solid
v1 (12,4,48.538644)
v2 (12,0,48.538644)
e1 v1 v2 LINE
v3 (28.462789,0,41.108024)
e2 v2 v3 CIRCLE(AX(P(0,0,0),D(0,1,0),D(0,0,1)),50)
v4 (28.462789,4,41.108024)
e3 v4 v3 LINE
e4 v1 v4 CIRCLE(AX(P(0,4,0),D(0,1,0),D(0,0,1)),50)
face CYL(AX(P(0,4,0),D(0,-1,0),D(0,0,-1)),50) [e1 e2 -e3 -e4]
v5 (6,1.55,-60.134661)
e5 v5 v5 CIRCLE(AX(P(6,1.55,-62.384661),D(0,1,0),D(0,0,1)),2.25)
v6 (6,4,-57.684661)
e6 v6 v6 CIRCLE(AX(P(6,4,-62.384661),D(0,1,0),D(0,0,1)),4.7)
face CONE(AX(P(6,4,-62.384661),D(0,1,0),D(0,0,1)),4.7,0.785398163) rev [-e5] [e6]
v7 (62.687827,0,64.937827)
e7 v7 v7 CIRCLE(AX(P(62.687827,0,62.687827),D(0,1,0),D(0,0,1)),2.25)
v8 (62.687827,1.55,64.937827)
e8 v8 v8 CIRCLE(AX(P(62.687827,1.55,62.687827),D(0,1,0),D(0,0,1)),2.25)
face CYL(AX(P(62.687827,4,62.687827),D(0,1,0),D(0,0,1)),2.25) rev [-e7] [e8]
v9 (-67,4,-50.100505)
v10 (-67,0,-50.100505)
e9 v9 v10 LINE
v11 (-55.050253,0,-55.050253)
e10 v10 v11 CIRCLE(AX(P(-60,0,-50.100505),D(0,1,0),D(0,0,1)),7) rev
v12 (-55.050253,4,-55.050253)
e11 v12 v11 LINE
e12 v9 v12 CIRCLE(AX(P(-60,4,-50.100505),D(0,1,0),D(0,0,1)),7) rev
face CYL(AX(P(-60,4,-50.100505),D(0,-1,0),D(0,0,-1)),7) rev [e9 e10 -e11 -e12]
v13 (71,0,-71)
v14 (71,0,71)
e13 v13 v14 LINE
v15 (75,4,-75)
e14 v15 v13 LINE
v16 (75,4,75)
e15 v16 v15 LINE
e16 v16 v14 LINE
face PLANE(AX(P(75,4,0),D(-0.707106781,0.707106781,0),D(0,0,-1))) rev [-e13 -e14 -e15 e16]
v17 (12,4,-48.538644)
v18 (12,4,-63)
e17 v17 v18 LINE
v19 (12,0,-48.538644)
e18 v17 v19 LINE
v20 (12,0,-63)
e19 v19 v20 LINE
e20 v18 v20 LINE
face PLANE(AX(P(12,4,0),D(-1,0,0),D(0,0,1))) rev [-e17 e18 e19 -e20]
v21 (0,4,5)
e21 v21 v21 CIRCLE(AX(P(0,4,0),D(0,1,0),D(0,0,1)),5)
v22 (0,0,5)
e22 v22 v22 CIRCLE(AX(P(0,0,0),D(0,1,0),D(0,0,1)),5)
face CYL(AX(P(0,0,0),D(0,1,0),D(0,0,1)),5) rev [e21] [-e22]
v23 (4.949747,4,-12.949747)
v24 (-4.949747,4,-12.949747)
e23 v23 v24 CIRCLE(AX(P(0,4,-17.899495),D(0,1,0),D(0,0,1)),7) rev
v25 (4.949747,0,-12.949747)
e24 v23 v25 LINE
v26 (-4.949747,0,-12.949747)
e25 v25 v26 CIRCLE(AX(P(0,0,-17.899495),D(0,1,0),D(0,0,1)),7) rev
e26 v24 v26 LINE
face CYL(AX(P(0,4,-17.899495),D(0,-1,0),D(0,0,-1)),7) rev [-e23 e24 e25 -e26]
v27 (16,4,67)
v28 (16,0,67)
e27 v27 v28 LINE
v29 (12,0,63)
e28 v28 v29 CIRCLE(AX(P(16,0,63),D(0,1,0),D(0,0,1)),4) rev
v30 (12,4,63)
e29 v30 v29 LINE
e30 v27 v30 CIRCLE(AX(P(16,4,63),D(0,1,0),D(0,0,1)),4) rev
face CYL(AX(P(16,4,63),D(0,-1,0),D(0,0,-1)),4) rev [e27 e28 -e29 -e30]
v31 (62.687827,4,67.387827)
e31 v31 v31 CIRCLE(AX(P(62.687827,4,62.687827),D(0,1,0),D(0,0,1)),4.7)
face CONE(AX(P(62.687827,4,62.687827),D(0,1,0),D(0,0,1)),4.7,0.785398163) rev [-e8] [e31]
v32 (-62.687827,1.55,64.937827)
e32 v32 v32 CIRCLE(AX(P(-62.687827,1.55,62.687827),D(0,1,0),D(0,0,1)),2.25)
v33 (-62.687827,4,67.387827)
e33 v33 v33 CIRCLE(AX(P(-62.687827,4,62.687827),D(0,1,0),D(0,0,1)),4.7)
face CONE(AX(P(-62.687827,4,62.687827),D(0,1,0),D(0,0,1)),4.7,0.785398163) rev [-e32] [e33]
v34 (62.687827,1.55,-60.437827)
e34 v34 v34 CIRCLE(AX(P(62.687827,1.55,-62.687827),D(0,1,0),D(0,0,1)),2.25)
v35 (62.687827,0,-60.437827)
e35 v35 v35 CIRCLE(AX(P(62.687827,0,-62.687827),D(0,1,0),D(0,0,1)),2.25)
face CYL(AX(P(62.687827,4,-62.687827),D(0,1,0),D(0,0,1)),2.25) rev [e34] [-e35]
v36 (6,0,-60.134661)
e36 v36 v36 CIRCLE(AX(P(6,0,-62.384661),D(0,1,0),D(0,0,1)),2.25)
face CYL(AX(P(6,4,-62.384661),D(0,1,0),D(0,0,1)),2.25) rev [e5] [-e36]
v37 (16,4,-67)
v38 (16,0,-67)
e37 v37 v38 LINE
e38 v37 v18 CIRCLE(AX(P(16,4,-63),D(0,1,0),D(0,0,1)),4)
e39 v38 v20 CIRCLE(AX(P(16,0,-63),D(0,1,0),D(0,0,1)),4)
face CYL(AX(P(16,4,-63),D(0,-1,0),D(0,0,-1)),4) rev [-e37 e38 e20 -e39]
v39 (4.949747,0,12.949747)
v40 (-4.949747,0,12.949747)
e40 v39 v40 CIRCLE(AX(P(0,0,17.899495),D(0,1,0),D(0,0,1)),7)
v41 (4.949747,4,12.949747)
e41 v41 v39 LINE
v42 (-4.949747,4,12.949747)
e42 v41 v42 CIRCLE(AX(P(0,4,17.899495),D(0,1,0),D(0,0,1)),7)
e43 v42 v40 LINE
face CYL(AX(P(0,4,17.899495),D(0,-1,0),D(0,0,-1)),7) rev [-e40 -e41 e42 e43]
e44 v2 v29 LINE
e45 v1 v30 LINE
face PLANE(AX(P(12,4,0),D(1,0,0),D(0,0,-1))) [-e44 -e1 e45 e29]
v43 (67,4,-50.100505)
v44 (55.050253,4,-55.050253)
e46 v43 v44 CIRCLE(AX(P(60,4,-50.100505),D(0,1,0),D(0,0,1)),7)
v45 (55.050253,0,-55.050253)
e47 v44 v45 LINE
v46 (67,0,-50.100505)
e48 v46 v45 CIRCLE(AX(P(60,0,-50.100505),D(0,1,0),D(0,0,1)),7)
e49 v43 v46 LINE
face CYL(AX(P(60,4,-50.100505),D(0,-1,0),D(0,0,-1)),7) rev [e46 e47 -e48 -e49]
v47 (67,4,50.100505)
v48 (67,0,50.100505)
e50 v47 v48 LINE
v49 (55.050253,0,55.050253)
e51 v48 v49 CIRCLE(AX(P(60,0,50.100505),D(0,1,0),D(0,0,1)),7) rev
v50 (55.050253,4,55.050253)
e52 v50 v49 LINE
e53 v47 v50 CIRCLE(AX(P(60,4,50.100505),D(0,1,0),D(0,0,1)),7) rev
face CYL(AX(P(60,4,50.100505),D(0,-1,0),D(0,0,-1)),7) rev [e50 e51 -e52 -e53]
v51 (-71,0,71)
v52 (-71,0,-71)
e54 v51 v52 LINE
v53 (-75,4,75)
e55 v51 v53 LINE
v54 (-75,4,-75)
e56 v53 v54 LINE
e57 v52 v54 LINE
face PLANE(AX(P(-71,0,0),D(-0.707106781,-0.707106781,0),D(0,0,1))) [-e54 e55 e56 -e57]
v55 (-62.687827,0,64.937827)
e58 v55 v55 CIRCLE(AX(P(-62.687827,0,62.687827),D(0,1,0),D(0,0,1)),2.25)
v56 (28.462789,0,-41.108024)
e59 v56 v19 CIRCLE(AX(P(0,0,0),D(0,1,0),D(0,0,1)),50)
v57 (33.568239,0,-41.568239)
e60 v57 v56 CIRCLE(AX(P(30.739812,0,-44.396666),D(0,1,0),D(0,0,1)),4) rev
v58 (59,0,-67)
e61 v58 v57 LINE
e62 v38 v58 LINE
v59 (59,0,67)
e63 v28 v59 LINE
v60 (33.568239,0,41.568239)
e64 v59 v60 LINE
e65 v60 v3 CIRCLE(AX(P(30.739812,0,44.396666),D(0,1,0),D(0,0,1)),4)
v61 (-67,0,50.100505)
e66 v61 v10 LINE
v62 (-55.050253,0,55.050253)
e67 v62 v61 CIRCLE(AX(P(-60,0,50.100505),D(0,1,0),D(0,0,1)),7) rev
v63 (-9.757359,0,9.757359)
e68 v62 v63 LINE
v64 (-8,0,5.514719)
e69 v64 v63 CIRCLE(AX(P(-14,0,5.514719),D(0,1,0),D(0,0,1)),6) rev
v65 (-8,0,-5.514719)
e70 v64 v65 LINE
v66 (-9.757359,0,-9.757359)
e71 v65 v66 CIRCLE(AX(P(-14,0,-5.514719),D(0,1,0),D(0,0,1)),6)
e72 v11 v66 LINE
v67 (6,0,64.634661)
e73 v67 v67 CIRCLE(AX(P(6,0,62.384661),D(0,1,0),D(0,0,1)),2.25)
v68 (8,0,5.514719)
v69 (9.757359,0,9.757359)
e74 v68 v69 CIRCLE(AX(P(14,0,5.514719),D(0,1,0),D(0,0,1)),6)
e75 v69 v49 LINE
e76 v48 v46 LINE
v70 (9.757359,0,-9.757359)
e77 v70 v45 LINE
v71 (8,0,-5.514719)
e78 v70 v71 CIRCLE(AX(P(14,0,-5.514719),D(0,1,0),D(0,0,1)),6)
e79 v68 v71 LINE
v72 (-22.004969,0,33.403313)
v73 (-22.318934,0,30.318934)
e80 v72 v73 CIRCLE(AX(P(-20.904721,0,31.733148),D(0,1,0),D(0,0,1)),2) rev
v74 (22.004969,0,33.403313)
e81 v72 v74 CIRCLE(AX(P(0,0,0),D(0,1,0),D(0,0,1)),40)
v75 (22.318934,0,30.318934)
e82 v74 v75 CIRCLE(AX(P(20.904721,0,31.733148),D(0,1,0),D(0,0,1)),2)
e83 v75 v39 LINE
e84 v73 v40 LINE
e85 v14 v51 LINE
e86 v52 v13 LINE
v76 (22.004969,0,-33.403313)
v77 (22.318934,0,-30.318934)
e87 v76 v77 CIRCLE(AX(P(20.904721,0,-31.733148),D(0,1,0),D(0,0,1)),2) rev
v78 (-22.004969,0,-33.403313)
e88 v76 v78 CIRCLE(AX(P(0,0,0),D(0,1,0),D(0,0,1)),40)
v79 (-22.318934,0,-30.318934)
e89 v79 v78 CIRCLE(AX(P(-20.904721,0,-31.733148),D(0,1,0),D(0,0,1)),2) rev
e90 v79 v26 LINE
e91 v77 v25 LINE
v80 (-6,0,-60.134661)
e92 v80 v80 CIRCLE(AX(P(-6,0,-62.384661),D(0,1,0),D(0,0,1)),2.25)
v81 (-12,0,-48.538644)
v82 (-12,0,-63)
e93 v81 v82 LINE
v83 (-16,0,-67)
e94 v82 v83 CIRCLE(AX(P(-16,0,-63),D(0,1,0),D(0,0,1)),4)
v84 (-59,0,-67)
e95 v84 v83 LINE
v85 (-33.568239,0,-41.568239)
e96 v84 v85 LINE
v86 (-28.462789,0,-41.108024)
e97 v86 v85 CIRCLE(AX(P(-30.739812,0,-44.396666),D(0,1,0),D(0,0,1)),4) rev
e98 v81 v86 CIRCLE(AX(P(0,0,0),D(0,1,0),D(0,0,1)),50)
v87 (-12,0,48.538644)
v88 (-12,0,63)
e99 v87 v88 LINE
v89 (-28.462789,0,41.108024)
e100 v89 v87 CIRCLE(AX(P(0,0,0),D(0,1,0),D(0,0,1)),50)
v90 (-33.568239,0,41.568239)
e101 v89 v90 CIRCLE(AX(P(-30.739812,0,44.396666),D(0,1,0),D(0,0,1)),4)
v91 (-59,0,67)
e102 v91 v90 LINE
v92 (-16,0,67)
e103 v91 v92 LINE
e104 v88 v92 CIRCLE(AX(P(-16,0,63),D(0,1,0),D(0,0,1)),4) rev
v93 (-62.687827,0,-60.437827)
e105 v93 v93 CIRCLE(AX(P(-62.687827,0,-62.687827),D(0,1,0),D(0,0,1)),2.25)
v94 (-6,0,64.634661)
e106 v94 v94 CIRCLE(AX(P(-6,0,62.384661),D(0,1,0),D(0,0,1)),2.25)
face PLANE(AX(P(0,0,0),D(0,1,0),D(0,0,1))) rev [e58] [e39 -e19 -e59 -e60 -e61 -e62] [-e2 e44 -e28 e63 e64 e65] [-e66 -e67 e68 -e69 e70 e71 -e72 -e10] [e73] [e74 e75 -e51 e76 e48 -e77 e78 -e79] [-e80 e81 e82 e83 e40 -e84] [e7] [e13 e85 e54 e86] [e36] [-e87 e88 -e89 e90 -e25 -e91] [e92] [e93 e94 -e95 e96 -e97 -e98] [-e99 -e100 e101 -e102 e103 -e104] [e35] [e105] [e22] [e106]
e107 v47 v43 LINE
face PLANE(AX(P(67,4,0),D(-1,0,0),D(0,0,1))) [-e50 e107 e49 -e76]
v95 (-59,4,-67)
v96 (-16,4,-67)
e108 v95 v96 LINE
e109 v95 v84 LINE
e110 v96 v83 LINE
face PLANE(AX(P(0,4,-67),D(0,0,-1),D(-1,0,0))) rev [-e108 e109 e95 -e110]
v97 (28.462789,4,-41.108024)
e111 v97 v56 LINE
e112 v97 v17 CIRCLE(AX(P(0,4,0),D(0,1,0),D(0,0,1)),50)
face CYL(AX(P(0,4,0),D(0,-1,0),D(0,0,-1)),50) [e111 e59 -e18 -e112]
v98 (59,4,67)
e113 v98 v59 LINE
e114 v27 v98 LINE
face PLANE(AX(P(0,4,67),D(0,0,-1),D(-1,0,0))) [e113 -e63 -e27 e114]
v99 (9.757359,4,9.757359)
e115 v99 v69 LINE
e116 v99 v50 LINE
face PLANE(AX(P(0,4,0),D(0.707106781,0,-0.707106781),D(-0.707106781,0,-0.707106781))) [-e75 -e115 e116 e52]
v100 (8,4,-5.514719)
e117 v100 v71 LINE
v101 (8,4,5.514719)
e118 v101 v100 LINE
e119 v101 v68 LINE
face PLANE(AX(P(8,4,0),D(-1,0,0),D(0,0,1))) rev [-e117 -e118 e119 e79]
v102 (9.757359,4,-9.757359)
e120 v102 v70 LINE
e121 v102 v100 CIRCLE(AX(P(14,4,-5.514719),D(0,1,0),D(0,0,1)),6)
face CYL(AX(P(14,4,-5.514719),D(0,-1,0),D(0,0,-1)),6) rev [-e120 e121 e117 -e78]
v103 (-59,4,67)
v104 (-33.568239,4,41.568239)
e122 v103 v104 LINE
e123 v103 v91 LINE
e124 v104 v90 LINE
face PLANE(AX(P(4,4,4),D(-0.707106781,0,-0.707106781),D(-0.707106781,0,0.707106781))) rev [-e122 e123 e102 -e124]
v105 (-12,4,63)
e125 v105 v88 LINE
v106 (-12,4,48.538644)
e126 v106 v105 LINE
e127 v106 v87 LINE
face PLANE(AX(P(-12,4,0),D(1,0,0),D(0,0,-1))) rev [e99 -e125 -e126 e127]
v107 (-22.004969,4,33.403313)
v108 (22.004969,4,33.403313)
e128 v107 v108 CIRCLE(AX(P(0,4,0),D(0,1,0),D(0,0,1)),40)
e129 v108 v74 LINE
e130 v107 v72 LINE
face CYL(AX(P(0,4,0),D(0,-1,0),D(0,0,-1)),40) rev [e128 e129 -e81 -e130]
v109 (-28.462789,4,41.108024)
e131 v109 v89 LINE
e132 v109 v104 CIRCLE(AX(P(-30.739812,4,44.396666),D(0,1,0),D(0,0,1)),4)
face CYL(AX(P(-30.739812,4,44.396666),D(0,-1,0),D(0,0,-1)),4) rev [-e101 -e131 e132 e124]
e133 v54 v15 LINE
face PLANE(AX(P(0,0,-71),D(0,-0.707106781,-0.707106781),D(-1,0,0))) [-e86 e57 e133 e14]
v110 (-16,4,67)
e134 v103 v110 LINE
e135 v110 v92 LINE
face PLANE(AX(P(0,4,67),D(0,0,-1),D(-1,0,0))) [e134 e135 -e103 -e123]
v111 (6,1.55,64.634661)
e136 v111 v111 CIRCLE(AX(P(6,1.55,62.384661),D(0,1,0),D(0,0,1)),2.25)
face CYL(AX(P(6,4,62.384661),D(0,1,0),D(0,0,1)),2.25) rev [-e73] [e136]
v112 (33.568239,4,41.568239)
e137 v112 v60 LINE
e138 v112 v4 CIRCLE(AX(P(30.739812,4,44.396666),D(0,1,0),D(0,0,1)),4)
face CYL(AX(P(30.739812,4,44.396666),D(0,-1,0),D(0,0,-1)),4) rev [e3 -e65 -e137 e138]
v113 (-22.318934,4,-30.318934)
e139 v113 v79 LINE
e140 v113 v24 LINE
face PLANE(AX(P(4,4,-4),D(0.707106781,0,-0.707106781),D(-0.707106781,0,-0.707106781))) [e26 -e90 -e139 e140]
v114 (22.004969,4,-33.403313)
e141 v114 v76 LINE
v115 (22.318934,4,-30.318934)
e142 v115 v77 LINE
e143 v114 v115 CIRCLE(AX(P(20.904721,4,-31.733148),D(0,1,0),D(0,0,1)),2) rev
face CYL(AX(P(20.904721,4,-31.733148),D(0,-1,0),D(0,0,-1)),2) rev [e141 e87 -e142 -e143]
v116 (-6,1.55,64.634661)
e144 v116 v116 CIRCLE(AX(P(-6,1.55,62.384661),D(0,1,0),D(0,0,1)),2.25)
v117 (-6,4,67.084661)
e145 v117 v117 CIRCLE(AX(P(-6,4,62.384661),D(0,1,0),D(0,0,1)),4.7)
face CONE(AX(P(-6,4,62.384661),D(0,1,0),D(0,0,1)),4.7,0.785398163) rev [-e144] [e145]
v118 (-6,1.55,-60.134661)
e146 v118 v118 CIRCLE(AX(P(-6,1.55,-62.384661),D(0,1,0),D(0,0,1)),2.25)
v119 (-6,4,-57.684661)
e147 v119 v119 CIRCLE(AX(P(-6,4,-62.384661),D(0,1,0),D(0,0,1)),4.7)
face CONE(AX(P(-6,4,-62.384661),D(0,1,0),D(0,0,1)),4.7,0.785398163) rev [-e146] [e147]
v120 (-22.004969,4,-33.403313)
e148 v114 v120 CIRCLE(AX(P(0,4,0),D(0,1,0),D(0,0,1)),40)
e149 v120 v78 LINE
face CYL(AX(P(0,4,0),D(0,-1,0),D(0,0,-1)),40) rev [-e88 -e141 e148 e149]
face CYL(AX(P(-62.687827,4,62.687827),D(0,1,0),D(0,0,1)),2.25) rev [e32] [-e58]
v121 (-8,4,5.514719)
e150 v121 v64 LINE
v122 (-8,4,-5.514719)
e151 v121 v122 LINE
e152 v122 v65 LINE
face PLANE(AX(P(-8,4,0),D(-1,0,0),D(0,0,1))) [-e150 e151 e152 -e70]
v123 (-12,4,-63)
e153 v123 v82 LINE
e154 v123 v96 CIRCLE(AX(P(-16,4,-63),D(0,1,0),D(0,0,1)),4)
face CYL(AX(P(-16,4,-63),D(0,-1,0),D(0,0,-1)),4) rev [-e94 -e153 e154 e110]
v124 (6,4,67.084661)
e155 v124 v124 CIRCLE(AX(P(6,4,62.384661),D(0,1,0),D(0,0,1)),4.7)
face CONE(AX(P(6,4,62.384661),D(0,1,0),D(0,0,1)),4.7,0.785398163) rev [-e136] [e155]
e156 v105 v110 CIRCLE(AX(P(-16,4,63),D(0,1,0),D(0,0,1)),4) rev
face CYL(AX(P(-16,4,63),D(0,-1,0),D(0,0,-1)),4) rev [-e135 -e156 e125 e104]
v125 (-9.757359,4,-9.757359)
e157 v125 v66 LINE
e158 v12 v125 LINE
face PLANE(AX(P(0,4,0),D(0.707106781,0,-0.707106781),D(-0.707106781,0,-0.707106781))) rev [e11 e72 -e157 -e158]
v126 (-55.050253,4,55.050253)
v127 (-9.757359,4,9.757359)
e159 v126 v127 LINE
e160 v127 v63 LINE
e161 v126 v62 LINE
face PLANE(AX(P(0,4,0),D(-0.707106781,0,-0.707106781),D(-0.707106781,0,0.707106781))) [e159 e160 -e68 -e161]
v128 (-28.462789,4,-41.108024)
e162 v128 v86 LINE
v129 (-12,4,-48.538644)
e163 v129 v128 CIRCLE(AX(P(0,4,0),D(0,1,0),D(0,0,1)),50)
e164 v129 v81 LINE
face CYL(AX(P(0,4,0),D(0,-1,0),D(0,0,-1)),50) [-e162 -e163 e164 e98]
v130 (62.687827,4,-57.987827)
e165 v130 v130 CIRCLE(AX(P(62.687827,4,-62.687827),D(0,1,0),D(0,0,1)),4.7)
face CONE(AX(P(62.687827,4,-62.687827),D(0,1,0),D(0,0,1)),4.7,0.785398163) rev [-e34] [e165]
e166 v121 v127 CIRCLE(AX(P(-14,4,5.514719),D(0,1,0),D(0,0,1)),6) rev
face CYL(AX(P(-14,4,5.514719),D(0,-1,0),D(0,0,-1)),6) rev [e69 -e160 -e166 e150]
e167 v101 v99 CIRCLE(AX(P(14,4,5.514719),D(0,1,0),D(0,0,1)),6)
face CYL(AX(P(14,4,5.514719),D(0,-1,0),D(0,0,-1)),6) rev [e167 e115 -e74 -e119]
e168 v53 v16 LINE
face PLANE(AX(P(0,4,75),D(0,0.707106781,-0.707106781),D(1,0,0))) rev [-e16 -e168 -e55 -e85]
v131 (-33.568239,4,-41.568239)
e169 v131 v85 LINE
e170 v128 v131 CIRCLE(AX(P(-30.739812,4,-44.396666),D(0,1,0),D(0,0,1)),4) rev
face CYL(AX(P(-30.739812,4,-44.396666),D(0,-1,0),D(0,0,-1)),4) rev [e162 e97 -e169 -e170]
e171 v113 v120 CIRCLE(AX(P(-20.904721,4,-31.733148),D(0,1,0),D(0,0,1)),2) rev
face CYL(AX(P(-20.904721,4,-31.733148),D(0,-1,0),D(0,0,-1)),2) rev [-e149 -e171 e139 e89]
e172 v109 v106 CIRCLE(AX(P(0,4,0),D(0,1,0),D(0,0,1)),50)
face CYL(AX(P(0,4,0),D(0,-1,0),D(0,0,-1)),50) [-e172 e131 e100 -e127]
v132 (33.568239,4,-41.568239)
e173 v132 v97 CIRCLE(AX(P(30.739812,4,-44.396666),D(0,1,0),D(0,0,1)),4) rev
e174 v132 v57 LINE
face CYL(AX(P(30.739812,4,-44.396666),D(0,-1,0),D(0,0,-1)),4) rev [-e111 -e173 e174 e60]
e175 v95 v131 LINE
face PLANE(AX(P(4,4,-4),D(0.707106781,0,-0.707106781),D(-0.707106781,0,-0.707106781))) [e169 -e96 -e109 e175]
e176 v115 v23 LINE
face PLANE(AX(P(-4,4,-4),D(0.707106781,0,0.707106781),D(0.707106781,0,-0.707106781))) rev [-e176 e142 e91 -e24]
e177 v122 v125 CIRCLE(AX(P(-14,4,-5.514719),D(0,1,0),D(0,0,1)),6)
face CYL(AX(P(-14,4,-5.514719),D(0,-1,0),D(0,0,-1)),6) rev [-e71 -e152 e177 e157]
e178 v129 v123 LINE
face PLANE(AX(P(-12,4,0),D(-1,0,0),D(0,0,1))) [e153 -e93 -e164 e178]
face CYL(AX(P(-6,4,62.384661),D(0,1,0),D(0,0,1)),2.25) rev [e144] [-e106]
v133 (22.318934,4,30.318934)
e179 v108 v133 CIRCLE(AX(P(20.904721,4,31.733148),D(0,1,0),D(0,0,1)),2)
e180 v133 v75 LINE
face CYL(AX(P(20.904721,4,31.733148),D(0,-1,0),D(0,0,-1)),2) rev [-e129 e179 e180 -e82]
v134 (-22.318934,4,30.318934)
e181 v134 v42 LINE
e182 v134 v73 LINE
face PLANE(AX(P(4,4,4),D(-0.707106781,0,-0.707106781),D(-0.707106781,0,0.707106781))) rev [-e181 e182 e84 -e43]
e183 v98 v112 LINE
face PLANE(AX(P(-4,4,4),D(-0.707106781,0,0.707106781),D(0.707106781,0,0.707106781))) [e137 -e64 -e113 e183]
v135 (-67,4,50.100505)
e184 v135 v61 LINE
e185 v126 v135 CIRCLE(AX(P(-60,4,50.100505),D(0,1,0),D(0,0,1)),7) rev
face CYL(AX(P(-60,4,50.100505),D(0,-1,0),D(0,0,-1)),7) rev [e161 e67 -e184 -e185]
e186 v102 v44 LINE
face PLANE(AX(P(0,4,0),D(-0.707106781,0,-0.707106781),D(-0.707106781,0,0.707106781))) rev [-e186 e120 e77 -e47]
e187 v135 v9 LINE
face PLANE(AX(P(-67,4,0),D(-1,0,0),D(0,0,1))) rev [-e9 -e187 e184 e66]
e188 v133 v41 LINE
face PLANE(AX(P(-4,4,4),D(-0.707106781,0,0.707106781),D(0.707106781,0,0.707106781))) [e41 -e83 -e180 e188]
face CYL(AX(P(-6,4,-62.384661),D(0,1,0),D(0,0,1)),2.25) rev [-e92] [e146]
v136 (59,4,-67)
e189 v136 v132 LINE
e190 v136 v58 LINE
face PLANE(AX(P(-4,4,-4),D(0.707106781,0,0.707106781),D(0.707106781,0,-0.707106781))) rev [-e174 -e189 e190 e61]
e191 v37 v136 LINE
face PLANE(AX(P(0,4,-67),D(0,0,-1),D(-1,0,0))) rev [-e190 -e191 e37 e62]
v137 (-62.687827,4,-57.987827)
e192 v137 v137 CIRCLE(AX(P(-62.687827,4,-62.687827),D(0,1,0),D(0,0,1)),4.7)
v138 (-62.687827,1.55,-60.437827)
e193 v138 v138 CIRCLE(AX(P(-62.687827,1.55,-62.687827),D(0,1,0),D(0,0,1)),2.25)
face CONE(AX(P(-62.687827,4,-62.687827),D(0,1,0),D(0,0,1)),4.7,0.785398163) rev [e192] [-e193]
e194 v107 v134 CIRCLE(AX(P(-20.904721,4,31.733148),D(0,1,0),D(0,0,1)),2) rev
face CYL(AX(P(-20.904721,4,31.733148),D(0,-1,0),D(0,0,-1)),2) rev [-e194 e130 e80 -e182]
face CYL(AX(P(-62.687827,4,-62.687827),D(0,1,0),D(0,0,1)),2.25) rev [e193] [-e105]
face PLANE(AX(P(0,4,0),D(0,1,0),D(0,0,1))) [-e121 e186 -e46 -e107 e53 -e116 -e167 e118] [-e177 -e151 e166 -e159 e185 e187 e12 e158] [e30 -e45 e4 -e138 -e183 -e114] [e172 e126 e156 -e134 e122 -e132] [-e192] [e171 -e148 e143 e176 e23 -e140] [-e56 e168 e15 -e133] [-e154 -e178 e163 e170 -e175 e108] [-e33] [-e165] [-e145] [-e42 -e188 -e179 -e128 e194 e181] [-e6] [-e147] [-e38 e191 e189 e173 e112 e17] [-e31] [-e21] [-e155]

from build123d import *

# Parameters (mm, degrees)
BOSS_EXTRUDE2_DEPTH                            = 4
SKETCH2_R                                      = 5
CUT_EXTRUDE1_DEPTH                             = 107.141415103
CSK_FOR_M4_FLAT_HEAD_MACHINE_SCREW2_AT_2_COUNT = 2
CSK_FOR_M4_FLAT_HEAD_MACHINE_SCREW2_AT_2_PITCH = 12
CHAMFER1_SIZE                                  = 4


with BuildPart() as part:
    # Sketch1 → Boss-Extrude2 (new body)
    with BuildSketch(Plane(origin=(0, 0, 0), x_dir=(1, 0, 0), z_dir=(0, 1, 0))):
        Polygon((-75, 75), (-75, -75), (-67, -75), (67, -75), (75, -75), (75, 75), (67, 75), (-67, 75), align=None)
        with BuildLine():
            ThreePointArc((-22.004968974, 33.403313316), (0, 40), (22.004968974, 33.403313316))
            ThreePointArc((22.004968974, 33.403313316), (22.894438748, 31.935685036), (22.318934087, 30.318934087))
            Line((22.318934087, 30.318934087), (4.949747468, 12.949747468))
            ThreePointArc((4.949747468, 12.949747468), (0, 10.899494937), (-4.949747468, 12.949747468))
            Line((-4.949747468, 12.949747468), (-22.318934087, 30.318934087))
            ThreePointArc((-22.318934087, 30.318934087), (-22.894438748, 31.935685036), (-22.004968974, 33.403313316))
        make_face(mode=Mode.SUBTRACT)
        with BuildLine():
            Line((8, -5.514718626), (8, 5.514718626))
            ThreePointArc((8, 5.514718626), (8.456722805, 7.81081922), (9.757359313, 9.757359313))
            Line((9.757359313, 9.757359313), (55.050252532, 55.050252532))
            ThreePointArc((55.050252532, 55.050252532), (62.678784027, 56.567661791), (67, 50.100505063))
            Line((67, 50.100505063), (67, -50.100505063))
            ThreePointArc((67, -50.100505063), (62.678784027, -56.567661791), (55.050252532, -55.050252532))
            Line((55.050252532, -55.050252532), (9.757359313, -9.757359313))
            ThreePointArc((9.757359313, -9.757359313), (8.456722805, -7.81081922), (8, -5.514718626))
        make_face(mode=Mode.SUBTRACT)
        with BuildLine():
            Line((-16, -67), (-59, -67))
            Line((-59, -67), (-33.568239019, -41.568239019))
            ThreePointArc((-33.568239019, -41.568239019), (-31.098923321, -40.412818885), (-28.462788791, -41.108024207))
            ThreePointArc((-28.462788791, -41.108024207), (-20.569707054, -45.572877369), (-12, -48.538644398))
            Line((-12, -48.538644398), (-12, -63))
            ThreePointArc((-12, -63), (-13.171572875, -65.828427125), (-16, -67))
        make_face(mode=Mode.SUBTRACT)
        with BuildLine():
            Line((33.568239019, -41.568239019), (59, -67))
            Line((59, -67), (16, -67))
            ThreePointArc((16, -67), (13.171572875, -65.828427125), (12, -63))
            Line((12, -63), (12, -48.538644398))
            ThreePointArc((12, -48.538644398), (20.569707054, -45.572877369), (28.462788791, -41.108024207))
            ThreePointArc((28.462788791, -41.108024207), (31.098923321, -40.412818885), (33.568239019, -41.568239019))
        make_face(mode=Mode.SUBTRACT)
        with BuildLine():
            ThreePointArc((-4.949747468, -12.949747468), (0, -10.899494937), (4.949747468, -12.949747468))
            Line((4.949747468, -12.949747468), (22.318934087, -30.318934087))
            ThreePointArc((22.318934087, -30.318934087), (22.894438748, -31.935685036), (22.004968974, -33.403313316))
            ThreePointArc((22.004968974, -33.403313316), (0, -40), (-22.004968974, -33.403313316))
            ThreePointArc((-22.004968974, -33.403313316), (-22.894438748, -31.935685036), (-22.318934087, -30.318934087))
            Line((-22.318934087, -30.318934087), (-4.949747468, -12.949747468))
        make_face(mode=Mode.SUBTRACT)
        with BuildLine():
            Line((-67, -50.100505063), (-67, 50.100505063))
            ThreePointArc((-67, 50.100505063), (-62.678784027, 56.567661791), (-55.050252532, 55.050252532))
            Line((-55.050252532, 55.050252532), (-9.757359313, 9.757359313))
            ThreePointArc((-9.757359313, 9.757359313), (-8.456722805, 7.81081922), (-8, 5.514718626))
            Line((-8, 5.514718626), (-8, -5.514718626))
            ThreePointArc((-8, -5.514718626), (-8.456722805, -7.81081922), (-9.757359313, -9.757359313))
            Line((-9.757359313, -9.757359313), (-55.050252532, -55.050252532))
            ThreePointArc((-55.050252532, -55.050252532), (-62.678784027, -56.567661791), (-67, -50.100505063))
        make_face(mode=Mode.SUBTRACT)
        with BuildLine():
            Line((-33.568239019, 41.568239019), (-59, 67))
            Line((-59, 67), (-16, 67))
            ThreePointArc((-16, 67), (-13.171572875, 65.828427125), (-12, 63))
            Line((-12, 63), (-12, 48.538644398))
            ThreePointArc((-12, 48.538644398), (-20.569707054, 45.572877369), (-28.462788791, 41.108024207))
            ThreePointArc((-28.462788791, 41.108024207), (-31.098923321, 40.412818885), (-33.568239019, 41.568239019))
        make_face(mode=Mode.SUBTRACT)
        with BuildLine():
            Line((59, 67), (33.568239019, 41.568239019))
            ThreePointArc((33.568239019, 41.568239019), (31.098923321, 40.412818885), (28.462788791, 41.108024207))
            ThreePointArc((28.462788791, 41.108024207), (20.569707054, 45.572877369), (12, 48.538644398))
            Line((12, 48.538644398), (12, 63))
            ThreePointArc((12, 63), (13.171572875, 65.828427125), (16, 67))
            Line((16, 67), (59, 67))
        make_face(mode=Mode.SUBTRACT)
    extrude(amount=BOSS_EXTRUDE2_DEPTH)

    # Sketch2 → Cut-Extrude1 (cut, through all)
    with BuildSketch(Plane(origin=(0, 4, 0), x_dir=(1, 0, 0), z_dir=(0, 1, 0))):
        with Locations(Location((0, 0, 0), (0, 0, 270))):
            Circle(SKETCH2_R)
    extrude(amount=-CUT_EXTRUDE1_DEPTH, mode=Mode.SUBTRACT)

    # Sketch4 → CSK for M4 Flat Head Machine Screw1 (revolve, cut)
    with BuildSketch(Plane(origin=(-62.687827406, 4, -62.687827406), x_dir=(0, 0, 1), z_dir=(1, 0, 0))):
        Polygon((0, 0), (0, 4), (2.25, 4), (2.25, 2.45), (4.7, 0), align=None)
    csk_for_m4_flat_head_machine_screw1 = revolve(axis=Axis((-62.687827406, 10.35, -62.687827406), (0, -1, 0)), mode=Mode.SUBTRACT)

    # Mirror1: CSK for M4 Flat Head Machine Screw1 across plane
    add(csk_for_m4_flat_head_machine_screw1.mirror(Plane.XY), mode=Mode.SUBTRACT)

    # Mirror1 at the second plane: CSK for M4 Flat Head Machine Screw1 across plane
    add(csk_for_m4_flat_head_machine_screw1.mirror(Plane(origin=(0, 0, 0), x_dir=(0, 0, 1), z_dir=(1, 0, 0))), mode=Mode.SUBTRACT)

    # Mirror1 at the second plane copy 1 sketc → Mirror1 at the second plane copy 1 (revolve, cut)
    with BuildSketch(Plane(origin=(62.687827406, 4, 62.687827406), x_dir=(0, 0, -1), z_dir=(-1, 0, 0))):
        Polygon((0, 0), (0, 4), (2.25, 4), (2.25, 2.45), (4.7, 0), align=None)
    revolve(axis=Axis((62.687827406, 10.35, 62.687827406), (0, -1, 0)), mode=Mode.SUBTRACT)

    # Sketch10 → CSK for M4 Flat Head Machine Screw2 (revolve, cut)
    with BuildSketch(Plane(origin=(6, 4, -62.3846611), x_dir=(0, 0, 1), z_dir=(1, 0, 0))):
        Polygon((0, 0), (0, 4), (2.25, 4), (2.25, 2.45), (4.7, 0), align=None)
    csk_for_m4_flat_head_machine_screw2 = revolve(axis=Axis((6, 10.35, -62.3846611), (0, -1, 0)), mode=Mode.SUBTRACT)

    # CSK for M4 Flat Head Machine Screw2 at 2: CSK for M4 Flat Head Machine Screw2 ×2
    with Locations(*[(-i * CSK_FOR_M4_FLAT_HEAD_MACHINE_SCREW2_AT_2_PITCH, 0, 0) for i in range(1, CSK_FOR_M4_FLAT_HEAD_MACHINE_SCREW2_AT_2_COUNT)]):
        add(csk_for_m4_flat_head_machine_screw2, mode=Mode.SUBTRACT)

    # Mirror2: CSK for M4 Flat Head Machine Screw2 across plane
    add(csk_for_m4_flat_head_machine_screw2.mirror(Plane.XY), mode=Mode.SUBTRACT)

    # Mirror2 copy 1 sketch → Mirror2 copy 1 (revolve, cut)
    with BuildSketch(Plane(origin=(-6, 4, 62.3846611), x_dir=(0, 0, -1), z_dir=(1, 0, 0))):
        Polygon((0, 0), (0, -4), (2.25, -4), (2.25, -2.45), (4.7, 0), align=None)
    revolve(axis=Axis((-6, 10.35, 62.3846611), (0, 1, 0)), mode=Mode.SUBTRACT)

    # Chamfer1
    chamfer1_edges = [part.edges().sort_by_distance(p)[0] for p in [
        (0, 0, -75),
        (-75, 0, 0),
        (0, 0, 75),
        (75, 0, 0),
    ]]
    chamfer(chamfer1_edges, length=CHAMFER1_SIZE - 0.0001)  # a hair under: the kernel refuses the full size


solid = part.part
